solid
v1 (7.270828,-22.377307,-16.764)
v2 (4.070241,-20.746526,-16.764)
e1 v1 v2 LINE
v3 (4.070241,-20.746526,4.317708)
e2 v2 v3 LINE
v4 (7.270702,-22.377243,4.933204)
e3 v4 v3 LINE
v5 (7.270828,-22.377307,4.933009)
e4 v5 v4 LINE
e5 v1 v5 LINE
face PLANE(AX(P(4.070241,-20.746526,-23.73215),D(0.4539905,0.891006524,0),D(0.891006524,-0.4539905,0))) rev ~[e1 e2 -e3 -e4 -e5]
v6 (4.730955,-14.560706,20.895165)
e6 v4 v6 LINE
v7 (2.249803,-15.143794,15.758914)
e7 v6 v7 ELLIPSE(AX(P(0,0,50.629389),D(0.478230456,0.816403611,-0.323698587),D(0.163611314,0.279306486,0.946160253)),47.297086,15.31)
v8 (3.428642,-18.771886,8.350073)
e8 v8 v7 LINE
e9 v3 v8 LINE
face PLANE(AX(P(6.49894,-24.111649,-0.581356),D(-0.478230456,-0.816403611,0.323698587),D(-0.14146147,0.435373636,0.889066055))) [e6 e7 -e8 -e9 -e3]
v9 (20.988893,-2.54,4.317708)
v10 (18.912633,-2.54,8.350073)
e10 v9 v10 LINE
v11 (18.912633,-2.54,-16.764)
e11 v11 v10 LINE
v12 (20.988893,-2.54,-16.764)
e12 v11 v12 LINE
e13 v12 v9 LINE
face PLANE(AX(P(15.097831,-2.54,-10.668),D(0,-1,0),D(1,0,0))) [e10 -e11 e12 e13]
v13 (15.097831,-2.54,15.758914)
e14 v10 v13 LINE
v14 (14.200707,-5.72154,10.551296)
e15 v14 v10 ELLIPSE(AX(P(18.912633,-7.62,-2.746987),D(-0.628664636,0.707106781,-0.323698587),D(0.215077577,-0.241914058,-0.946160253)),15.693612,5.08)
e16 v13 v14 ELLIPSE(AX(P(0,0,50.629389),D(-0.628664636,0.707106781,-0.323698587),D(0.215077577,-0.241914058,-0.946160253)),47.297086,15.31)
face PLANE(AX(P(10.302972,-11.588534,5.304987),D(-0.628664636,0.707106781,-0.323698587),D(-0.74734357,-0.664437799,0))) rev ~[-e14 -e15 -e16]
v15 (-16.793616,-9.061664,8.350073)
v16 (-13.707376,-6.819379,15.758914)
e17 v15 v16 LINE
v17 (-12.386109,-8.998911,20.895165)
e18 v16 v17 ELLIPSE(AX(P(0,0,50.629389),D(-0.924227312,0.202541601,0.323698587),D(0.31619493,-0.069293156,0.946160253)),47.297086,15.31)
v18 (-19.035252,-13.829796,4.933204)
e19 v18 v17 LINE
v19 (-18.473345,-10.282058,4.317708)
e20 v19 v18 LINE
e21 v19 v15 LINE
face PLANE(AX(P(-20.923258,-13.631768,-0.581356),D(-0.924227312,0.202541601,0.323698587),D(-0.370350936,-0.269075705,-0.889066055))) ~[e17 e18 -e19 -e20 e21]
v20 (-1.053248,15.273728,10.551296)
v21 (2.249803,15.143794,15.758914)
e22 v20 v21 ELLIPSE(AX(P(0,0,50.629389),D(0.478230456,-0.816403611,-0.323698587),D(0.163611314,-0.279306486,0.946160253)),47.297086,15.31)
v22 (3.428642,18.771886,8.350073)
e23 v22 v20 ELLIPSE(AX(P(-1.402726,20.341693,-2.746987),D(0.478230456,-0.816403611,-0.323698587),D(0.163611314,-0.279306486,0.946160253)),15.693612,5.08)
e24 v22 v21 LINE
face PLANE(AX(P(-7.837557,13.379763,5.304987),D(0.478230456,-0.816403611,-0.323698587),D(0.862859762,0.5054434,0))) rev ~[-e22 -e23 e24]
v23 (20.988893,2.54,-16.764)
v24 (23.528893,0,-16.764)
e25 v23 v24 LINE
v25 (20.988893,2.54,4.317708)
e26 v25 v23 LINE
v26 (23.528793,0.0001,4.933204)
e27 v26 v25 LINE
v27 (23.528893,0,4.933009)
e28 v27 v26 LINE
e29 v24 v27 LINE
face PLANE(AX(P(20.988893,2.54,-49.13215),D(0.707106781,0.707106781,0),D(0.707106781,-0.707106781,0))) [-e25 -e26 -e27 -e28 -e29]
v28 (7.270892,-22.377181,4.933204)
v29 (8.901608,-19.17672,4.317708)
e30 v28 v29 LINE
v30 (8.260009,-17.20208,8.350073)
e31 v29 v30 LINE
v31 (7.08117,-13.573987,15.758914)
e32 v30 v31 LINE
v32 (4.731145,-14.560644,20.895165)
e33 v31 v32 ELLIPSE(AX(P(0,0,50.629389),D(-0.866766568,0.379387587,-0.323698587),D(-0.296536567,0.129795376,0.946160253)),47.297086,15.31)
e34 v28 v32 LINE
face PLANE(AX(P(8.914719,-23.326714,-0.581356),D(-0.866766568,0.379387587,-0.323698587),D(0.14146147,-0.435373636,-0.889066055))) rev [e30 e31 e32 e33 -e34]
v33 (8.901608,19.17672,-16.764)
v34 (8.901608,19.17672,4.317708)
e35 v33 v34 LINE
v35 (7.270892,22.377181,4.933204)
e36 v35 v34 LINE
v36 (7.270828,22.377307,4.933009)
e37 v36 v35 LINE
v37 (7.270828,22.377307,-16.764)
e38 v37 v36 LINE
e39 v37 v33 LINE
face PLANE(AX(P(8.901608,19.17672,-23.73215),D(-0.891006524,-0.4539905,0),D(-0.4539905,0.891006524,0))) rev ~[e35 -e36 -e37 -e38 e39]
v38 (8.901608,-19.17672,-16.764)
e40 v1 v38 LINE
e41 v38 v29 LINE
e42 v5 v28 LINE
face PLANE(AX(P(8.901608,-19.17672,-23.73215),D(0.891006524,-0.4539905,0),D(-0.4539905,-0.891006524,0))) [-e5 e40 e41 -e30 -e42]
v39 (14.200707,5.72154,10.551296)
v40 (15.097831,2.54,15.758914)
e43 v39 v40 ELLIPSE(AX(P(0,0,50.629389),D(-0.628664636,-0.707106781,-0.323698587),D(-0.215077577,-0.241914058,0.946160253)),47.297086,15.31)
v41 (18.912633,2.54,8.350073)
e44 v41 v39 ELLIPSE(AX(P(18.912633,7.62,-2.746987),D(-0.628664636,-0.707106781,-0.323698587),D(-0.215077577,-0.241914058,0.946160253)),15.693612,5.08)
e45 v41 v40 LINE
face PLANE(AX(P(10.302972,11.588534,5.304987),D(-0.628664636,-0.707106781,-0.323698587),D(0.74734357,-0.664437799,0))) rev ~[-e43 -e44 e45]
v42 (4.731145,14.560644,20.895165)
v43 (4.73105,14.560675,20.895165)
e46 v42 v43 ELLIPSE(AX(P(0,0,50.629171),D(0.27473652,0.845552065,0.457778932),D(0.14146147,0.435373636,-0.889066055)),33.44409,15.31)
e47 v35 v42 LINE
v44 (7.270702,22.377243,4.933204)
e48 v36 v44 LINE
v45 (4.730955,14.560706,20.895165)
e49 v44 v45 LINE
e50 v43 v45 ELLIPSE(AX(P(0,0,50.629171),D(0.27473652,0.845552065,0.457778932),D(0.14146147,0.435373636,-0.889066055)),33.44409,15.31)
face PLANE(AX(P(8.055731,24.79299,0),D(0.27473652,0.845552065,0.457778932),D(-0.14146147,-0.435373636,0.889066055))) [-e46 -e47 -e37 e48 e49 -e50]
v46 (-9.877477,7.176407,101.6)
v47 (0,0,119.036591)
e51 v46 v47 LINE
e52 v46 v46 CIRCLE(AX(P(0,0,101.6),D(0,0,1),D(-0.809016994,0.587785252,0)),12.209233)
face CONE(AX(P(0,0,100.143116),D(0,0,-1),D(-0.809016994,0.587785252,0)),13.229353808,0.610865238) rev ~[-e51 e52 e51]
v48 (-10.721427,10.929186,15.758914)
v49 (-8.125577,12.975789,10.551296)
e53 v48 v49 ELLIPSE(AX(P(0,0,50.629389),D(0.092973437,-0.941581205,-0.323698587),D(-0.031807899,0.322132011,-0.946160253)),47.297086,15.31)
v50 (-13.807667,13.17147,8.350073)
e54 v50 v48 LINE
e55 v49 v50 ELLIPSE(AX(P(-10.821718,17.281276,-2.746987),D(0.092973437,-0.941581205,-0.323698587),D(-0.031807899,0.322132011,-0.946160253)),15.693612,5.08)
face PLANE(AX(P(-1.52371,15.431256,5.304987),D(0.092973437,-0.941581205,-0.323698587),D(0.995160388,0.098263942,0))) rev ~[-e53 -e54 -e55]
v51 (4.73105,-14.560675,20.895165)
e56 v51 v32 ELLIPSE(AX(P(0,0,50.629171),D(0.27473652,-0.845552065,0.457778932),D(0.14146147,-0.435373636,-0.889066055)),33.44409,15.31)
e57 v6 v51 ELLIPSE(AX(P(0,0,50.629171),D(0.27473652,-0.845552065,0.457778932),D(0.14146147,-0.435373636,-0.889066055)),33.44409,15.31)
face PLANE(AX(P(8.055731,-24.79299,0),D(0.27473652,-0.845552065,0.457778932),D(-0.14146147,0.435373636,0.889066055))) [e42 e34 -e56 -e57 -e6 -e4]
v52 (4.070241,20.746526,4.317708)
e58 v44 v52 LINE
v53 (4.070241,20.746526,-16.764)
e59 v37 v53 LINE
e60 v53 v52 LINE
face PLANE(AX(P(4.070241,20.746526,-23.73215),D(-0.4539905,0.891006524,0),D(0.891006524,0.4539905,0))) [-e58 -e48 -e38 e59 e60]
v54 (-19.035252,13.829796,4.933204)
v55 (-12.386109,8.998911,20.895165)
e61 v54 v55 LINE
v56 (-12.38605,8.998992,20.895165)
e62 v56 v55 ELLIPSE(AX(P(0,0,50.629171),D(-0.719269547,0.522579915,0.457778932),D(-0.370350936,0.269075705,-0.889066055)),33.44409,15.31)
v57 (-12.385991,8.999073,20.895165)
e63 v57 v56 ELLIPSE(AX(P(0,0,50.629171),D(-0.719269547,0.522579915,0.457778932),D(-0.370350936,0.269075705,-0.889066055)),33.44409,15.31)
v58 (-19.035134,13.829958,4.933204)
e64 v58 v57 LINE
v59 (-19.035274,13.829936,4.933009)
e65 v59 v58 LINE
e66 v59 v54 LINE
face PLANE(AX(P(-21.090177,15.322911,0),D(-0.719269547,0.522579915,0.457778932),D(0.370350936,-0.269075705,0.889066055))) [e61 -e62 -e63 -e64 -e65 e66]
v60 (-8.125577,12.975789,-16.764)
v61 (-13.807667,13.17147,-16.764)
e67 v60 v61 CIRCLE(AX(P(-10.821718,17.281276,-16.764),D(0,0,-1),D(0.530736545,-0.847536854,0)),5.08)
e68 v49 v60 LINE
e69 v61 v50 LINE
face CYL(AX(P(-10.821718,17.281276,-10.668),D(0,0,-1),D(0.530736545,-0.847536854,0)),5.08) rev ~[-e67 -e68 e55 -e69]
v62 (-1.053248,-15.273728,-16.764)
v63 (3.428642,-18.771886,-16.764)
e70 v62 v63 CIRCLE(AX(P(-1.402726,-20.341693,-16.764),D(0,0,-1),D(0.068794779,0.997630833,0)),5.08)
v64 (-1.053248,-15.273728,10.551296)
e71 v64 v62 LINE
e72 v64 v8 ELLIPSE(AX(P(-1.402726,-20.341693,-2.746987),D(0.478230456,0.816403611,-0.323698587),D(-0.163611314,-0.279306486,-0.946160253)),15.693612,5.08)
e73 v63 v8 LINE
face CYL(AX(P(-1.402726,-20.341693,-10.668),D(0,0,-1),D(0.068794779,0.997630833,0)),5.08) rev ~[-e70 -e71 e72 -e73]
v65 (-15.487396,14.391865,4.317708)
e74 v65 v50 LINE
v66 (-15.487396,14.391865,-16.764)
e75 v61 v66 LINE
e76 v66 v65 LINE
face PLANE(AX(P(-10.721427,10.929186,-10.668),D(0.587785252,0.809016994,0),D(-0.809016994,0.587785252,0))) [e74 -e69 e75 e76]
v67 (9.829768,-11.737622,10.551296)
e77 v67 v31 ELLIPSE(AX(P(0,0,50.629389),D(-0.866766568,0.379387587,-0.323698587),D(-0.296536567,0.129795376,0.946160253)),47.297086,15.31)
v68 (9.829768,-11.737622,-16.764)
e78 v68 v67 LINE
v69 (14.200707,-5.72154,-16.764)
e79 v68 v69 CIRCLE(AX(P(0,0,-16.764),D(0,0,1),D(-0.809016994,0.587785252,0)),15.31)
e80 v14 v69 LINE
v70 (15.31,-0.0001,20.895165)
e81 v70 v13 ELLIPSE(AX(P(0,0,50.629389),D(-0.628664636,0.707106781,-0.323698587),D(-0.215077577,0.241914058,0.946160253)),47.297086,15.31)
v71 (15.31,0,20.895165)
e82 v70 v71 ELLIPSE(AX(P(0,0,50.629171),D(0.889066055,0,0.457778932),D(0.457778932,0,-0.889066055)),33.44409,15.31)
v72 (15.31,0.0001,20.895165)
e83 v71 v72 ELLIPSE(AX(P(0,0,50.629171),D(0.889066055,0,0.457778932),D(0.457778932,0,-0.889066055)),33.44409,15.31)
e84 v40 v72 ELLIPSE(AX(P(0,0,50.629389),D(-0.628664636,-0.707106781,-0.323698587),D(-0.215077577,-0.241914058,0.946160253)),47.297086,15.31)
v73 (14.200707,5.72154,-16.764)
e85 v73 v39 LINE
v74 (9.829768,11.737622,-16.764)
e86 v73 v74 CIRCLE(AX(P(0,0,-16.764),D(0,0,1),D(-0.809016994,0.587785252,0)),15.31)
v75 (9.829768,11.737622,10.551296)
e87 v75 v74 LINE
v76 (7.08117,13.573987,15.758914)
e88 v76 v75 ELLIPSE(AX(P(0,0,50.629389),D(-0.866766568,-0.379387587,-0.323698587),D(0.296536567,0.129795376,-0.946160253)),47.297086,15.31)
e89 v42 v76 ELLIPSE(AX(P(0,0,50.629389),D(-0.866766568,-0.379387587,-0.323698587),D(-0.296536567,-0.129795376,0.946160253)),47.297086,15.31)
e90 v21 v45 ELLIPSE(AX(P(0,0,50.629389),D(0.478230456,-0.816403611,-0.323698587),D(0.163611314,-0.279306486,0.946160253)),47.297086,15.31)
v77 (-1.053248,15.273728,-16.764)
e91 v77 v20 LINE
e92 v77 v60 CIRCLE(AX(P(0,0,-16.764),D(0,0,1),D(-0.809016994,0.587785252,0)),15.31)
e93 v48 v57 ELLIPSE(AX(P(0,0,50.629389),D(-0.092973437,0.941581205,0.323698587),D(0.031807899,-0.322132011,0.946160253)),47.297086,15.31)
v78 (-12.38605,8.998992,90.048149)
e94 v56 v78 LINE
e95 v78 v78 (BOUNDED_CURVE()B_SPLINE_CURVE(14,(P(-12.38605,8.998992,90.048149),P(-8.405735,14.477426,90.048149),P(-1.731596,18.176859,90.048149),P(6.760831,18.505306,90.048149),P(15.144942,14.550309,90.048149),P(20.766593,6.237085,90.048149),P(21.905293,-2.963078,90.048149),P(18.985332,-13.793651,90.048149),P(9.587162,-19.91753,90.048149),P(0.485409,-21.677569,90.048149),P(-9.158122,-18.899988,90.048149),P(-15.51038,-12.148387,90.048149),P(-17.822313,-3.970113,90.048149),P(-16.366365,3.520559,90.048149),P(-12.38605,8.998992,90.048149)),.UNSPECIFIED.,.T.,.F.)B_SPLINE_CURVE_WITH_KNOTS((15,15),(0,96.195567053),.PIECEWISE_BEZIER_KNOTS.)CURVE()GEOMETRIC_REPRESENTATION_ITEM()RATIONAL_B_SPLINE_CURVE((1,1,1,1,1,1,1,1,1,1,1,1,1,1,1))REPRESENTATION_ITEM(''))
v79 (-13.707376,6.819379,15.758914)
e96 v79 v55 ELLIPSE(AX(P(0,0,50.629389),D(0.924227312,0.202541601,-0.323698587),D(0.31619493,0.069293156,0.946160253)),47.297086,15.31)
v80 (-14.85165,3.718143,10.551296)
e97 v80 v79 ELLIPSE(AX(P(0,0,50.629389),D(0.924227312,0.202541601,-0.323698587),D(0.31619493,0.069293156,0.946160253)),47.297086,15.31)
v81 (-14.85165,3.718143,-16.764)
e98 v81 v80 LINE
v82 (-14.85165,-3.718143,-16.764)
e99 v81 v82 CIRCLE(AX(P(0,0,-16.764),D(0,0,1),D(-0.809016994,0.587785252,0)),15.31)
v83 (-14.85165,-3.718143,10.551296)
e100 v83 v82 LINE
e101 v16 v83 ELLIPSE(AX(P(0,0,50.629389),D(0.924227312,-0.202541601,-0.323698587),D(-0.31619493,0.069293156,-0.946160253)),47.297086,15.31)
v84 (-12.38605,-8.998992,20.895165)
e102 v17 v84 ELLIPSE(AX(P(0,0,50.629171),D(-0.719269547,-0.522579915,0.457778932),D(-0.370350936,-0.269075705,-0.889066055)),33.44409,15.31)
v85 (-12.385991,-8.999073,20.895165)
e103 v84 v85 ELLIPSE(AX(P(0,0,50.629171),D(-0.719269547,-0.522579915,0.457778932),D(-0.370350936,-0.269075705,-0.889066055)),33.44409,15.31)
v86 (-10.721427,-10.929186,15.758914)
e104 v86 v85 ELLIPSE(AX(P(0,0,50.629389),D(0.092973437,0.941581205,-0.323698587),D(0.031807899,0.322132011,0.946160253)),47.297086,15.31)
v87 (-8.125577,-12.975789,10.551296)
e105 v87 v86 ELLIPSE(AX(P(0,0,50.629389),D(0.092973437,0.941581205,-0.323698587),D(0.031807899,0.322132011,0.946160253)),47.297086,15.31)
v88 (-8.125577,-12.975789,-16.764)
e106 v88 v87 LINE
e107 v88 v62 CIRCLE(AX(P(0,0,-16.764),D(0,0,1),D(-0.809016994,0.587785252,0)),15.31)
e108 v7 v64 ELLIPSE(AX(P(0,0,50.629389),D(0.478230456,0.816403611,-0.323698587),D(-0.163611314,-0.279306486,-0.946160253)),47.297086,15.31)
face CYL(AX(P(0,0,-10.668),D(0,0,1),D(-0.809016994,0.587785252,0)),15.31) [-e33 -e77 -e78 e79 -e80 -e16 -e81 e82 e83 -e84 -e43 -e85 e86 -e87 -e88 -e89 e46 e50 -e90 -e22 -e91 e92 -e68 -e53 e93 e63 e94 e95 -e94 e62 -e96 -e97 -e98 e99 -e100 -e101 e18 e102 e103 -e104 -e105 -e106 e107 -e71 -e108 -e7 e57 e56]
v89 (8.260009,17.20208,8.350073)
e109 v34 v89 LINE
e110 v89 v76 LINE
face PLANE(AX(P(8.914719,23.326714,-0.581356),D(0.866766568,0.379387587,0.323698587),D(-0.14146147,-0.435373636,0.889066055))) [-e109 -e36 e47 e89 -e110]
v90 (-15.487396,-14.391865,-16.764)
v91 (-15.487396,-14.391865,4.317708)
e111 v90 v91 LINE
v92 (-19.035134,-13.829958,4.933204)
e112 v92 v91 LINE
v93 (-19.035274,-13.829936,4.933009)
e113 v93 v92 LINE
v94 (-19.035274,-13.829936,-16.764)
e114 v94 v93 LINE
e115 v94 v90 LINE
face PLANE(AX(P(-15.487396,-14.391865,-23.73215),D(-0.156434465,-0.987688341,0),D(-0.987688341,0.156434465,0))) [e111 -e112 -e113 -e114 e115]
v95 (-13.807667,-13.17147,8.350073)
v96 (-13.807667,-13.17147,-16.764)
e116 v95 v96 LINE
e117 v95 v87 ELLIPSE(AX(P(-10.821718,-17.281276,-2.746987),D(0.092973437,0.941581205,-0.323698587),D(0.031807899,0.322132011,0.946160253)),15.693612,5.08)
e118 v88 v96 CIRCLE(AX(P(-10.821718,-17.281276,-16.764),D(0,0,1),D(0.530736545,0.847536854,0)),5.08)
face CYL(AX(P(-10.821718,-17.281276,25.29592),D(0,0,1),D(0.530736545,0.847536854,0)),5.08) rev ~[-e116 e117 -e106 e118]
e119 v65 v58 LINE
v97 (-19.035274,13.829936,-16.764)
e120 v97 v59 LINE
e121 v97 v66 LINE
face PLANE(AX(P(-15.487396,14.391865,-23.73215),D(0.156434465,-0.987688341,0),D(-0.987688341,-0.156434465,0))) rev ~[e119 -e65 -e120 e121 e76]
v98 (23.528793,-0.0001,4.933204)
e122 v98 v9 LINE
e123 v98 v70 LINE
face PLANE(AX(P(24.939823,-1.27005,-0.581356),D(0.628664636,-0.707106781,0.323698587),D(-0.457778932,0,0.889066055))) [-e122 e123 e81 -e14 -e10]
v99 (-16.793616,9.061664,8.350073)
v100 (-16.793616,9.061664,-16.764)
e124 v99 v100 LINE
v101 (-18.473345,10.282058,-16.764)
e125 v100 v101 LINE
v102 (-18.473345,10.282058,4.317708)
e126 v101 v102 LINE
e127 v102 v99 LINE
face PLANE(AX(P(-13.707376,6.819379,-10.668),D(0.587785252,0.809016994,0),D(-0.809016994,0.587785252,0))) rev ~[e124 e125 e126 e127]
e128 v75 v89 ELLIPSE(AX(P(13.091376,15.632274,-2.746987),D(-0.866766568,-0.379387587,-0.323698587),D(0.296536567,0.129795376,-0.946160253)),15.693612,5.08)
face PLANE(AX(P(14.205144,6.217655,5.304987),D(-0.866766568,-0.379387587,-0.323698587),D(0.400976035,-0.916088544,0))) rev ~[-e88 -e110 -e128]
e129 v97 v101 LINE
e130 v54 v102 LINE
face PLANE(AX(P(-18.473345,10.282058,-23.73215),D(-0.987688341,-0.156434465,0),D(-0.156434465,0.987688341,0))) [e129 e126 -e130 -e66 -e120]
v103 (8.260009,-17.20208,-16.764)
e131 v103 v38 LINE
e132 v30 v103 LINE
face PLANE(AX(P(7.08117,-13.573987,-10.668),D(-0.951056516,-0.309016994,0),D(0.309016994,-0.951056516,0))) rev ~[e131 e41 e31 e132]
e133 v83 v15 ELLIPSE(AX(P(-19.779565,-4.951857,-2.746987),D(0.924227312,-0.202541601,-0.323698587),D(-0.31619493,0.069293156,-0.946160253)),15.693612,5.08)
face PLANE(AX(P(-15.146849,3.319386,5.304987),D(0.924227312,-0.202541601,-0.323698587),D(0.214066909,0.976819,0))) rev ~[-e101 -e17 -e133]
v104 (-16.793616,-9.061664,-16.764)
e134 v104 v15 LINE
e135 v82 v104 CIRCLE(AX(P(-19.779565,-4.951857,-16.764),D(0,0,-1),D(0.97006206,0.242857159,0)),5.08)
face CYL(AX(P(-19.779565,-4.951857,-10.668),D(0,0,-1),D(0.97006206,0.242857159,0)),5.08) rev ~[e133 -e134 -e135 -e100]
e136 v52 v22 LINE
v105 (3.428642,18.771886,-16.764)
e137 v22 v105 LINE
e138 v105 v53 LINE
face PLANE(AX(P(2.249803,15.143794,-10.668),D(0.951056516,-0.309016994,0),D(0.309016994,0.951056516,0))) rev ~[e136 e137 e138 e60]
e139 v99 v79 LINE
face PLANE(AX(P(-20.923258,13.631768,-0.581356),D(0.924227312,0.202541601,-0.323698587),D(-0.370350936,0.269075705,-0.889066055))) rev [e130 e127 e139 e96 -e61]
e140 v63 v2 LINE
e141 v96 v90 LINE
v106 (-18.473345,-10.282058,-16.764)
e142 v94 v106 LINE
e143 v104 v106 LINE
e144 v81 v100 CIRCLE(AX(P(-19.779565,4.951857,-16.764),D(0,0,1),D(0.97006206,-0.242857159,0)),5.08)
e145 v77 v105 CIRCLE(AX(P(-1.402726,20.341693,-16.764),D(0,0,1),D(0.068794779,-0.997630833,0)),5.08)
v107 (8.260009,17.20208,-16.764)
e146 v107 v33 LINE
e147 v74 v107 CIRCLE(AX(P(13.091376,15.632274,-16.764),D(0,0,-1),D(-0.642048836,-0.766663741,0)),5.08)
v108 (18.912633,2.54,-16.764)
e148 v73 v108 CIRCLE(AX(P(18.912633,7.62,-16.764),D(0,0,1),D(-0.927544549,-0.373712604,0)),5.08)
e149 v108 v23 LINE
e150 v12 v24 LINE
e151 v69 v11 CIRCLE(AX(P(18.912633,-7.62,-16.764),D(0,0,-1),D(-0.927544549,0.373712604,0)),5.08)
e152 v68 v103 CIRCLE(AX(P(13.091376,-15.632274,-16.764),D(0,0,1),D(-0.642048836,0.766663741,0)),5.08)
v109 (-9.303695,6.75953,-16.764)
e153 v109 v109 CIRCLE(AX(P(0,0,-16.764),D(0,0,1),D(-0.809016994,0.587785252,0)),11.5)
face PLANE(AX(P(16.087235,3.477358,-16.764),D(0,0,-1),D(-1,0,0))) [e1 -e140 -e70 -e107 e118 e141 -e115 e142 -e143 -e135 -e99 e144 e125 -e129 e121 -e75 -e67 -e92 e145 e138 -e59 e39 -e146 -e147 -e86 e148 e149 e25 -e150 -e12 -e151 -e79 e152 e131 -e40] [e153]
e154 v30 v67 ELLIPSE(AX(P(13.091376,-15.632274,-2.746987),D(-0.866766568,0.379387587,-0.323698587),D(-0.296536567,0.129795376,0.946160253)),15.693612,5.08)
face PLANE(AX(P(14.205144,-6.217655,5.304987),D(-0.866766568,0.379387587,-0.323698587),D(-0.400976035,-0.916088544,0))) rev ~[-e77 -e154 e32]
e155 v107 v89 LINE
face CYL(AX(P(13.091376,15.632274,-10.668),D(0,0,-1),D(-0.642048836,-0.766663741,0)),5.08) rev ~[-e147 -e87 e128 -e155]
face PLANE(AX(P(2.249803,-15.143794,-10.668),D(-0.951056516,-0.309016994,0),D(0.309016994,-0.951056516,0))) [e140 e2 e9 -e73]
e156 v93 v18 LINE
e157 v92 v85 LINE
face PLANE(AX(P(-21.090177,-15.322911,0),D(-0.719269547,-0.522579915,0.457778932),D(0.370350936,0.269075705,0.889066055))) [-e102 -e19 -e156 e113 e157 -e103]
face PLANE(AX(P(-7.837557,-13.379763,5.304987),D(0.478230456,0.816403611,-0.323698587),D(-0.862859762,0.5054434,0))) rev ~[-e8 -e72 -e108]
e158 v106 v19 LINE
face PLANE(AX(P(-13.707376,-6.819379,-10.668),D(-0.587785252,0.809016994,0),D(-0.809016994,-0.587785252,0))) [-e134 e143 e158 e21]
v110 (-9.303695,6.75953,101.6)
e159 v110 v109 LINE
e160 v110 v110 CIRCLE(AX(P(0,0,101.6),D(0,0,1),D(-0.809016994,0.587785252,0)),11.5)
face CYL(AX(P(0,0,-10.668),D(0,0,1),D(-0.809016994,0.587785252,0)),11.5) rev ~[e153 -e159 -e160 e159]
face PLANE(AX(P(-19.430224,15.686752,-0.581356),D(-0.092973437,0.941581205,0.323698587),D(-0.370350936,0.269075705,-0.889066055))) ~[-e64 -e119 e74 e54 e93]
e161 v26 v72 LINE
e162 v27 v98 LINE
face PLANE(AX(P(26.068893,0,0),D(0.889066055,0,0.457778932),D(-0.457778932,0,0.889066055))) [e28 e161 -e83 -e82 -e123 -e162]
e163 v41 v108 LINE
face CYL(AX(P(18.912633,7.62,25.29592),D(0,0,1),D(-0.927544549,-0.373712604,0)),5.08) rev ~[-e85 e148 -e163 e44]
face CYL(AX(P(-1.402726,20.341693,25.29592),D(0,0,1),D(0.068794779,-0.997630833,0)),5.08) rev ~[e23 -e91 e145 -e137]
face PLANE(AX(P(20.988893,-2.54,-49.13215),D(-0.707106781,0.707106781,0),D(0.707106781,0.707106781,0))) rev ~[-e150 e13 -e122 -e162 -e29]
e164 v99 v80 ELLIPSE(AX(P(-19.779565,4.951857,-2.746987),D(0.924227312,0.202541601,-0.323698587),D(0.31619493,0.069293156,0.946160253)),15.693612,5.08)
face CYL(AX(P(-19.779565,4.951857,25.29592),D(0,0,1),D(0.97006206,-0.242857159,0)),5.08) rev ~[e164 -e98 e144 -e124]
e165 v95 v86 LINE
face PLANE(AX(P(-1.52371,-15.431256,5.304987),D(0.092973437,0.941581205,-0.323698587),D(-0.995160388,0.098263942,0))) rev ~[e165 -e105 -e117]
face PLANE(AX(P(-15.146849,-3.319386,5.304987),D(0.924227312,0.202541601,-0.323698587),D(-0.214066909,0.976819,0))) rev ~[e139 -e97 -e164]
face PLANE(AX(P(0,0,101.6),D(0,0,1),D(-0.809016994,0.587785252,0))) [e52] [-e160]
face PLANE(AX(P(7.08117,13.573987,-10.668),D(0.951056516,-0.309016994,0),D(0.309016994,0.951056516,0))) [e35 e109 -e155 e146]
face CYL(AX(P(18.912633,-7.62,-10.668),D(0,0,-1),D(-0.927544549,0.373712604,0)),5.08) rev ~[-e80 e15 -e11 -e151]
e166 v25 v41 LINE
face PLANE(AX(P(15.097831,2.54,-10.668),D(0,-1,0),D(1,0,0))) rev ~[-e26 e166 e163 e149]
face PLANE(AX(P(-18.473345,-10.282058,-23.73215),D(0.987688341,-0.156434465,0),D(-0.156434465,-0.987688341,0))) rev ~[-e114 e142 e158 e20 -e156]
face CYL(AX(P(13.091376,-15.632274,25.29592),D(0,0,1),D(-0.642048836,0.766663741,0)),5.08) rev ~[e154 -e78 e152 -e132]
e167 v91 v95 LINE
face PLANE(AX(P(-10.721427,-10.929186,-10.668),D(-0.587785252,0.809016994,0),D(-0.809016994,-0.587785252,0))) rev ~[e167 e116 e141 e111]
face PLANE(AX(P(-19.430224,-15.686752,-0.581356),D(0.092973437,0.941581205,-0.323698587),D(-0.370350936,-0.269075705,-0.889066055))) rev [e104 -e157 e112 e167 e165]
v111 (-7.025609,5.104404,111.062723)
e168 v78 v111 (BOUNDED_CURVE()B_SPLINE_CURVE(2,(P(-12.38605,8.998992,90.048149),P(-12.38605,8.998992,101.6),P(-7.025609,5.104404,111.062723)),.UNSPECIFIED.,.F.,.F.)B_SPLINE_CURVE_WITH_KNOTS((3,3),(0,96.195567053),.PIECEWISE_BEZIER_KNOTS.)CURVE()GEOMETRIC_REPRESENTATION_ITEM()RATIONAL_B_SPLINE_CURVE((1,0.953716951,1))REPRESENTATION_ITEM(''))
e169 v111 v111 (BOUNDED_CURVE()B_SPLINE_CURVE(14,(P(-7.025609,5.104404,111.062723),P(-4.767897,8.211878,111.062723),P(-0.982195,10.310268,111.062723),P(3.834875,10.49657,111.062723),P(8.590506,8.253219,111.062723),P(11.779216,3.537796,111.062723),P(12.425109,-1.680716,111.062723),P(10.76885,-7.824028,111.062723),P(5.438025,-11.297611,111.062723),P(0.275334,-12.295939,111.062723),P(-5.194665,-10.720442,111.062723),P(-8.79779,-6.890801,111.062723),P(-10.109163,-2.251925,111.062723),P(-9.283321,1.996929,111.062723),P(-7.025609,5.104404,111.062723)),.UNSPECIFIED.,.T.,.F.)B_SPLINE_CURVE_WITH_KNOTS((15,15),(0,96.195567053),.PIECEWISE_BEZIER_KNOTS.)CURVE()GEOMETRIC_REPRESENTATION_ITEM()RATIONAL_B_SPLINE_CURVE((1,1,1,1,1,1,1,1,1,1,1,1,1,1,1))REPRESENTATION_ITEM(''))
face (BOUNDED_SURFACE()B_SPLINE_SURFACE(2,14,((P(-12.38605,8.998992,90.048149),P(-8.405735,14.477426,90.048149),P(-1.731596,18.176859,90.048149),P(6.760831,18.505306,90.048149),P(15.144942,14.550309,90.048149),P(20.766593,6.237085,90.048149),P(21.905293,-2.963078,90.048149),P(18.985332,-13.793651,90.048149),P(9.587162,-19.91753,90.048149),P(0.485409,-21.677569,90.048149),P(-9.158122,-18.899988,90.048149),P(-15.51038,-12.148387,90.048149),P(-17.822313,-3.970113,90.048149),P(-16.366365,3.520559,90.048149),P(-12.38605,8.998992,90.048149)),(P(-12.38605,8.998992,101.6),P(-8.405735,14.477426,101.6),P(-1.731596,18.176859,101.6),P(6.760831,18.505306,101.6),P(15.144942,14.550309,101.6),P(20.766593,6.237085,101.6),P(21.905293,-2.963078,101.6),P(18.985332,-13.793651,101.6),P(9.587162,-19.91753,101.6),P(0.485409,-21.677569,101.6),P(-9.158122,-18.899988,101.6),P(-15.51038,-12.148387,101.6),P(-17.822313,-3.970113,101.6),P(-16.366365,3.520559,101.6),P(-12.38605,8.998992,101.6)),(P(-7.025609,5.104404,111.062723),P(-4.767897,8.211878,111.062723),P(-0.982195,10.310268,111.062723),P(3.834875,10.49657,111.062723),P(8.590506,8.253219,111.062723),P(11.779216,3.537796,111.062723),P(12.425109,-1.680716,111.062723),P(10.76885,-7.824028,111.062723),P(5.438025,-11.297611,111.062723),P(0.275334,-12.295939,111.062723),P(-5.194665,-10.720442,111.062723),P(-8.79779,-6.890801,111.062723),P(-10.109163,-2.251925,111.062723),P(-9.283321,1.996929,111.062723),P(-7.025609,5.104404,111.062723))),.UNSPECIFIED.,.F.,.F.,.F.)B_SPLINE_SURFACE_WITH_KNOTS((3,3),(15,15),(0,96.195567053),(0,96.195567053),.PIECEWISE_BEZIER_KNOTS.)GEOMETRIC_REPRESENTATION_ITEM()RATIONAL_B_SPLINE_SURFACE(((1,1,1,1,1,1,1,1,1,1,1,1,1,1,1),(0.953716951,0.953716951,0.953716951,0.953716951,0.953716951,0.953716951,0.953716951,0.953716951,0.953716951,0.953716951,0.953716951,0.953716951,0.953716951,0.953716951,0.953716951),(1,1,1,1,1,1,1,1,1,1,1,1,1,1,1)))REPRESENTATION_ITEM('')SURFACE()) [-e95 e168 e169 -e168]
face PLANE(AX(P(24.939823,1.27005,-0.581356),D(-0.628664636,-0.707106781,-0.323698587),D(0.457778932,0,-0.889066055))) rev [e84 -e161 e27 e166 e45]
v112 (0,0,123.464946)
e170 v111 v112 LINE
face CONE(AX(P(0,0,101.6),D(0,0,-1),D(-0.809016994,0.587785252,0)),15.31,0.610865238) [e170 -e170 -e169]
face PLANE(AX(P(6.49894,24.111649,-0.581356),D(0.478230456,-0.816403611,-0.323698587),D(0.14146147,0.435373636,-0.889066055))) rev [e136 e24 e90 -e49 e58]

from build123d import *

# Parameters (mm, degrees)
F0_R          = 15.31
F0_R_2        = 11.5
F1_DEPTH      = 101.6
F2_DEPTH      = 25.4
F3_DEPTH      = 25.4
F4_DEPTH      = 25.4
F5_DEPTH      = 25.4
F6_R          = 15.31
F7_DEPTH      = 25.4
F7_TAPER      = 35
F8_T          = 2.54
F10_DEPTH     = 2.54
F11_DEPTH     = 10.668
F12_COUNT     = 5
F14_SIZE      = 2.5399
F15_DEPTH     = 25.4
F16_T1_DEPTH  = 31.2479879022
F16_T3_DEPTH  = 26.3887057153
F16_T5_DEPTH  = 18.1838383234
F16_T7_DEPTH  = 38.4641495789
F17_DEPTH     = 19.304
F18_R         = 36.6377921473
F19_T1_DEPTH  = 6.096
F19_T6_DEPTH  = 35.9639195383
F19_T11_DEPTH = 35.9639195383
F19_T16_DEPTH = 35.9639195383
F19_T21_DEPTH = 35.9639195383
F19_T26_DEPTH = 35.9639195383
F19_T31_DEPTH = 35.9639195383
F19_T36_DEPTH = 35.9639195383
F19_T41_DEPTH = 35.9639195383
F19_T46_DEPTH = 35.9639195383
F19_T51_DEPTH = 35.9639195383


# Not quite as in the source:
# - a fillet or chamfer that OpenCascade refuses, or shapes differently, is made with other operations: its cross-section is extruded or revolved along the edge and cut away or added
# - a fillet or chamfer is up to 0.001 mm smaller than in the source, because OpenCascade refuses the exact size
# - a shell that OpenCascade refuses in one call is made with other operations: the cavity is built on its own and cut out


with BuildPart() as f1:
    # F0 (on Top) → F1 (new body)
    with BuildSketch(Plane.XY):
        Circle(F0_R)
        Circle(F0_R_2, mode=Mode.SUBTRACT)
    extrude(amount=F1_DEPTH)

    # F2 (add): a face of the model
    f2_faces = [f1.faces().sort_by_distance(p)[0] for p in [
        (-14.8769678072, 0, 101.6),
    ]]
    extrude(f2_faces, amount=F2_DEPTH)

    # F3 (cut): a face of the model
    f3_faces = [f1.faces().sort_by_distance(p)[0] for p in [
        (-14.8769678072, 0, 127),
    ]]
    extrude(f3_faces, amount=-F3_DEPTH, mode=Mode.SUBTRACT)

    # F4 (add): a face of the model
    f4_faces = [f1.faces().sort_by_distance(p)[0] for p in [
        (-14.8769678072, 0, 101.6),
    ]]
    extrude(f4_faces, amount=F4_DEPTH)

    # F5 (cut): a face of the model
    f5_faces = [f1.faces().sort_by_distance(p)[0] for p in [
        (-14.8769678072, 0, 127),
    ]]
    extrude(f5_faces, amount=-F5_DEPTH, mode=Mode.SUBTRACT)

    # F6 (on face) → F7 (join)
    with BuildSketch(Plane.XY.offset(101.6)):
        Circle(F6_R)
    extrude(amount=F7_DEPTH, taper=F7_TAPER)

    # F8: shell of thickness 2.54, made by hand


with BuildPart() as f8_core1:
    # F8_t2: copy of F1
    add(f1.part)

    # the walls: a layer under each face that stays
    f8_faces = [f8_core1.faces().sort_by_distance(p)[0] for p in [
        (-15.31, 0, 50.8),
        (-7.655, 0, 112.5324729916),
        (-10.2066666667, -10.2066666667, 0),
        (-11.5, 0, 50.8),
    ]]
    thicken(f8_faces, amount=-F8_T, mode=Mode.SUBTRACT)


with BuildPart() as f1_1:
    add(f1.part)

    # what is left inside the walls is the cavity
    f8_cavity = [f8_core1.part.solids().sort_by_distance(p)[0] for p in [
        (-8.118682, 0, 107.397628),
    ]]
    add(f8_cavity, mode=Mode.SUBTRACT)

    # F9 (on Front) → F10 (join, symmetric)
    with BuildSketch(Plane.XZ):
        Polygon((26.068892777, 0), (12.5377972627, 26.279142328), (12.7, 0), align=None)
    extrude(amount=F10_DEPTH, both=True)

    # F11 (add): a face of the model
    f11_faces = [f1_1.faces().sort_by_distance(p)[0] for p in [
        (-14.7952381942, 0, 0),
    ]]
    extrude(f11_faces, amount=F11_DEPTH)


with BuildPart() as f12_1:
    # F12: instance of F1
    add(f1_1.part.rotate(Axis((0, 0, 0), (0, 0, 1)), 1 * 360 / F12_COUNT))


with BuildPart() as f12_2:
    # F12: instance of F1
    add(f1_1.part.rotate(Axis((0, 0, 0), (0, 0, 1)), 2 * 360 / F12_COUNT))


with BuildPart() as f12_3:
    # F12: instance of F1
    add(f1_1.part.rotate(Axis((0, 0, 0), (0, 0, 1)), 3 * 360 / F12_COUNT))


with BuildPart() as f12_4:
    # F12: instance of F1
    add(f1_1.part.rotate(Axis((0, 0, 0), (0, 0, 1)), 4 * 360 / F12_COUNT))


with BuildPart() as f12_2_1:
    add(f12_2.part)

    # F13: union F12_1, F1, F12_4, F12_3
    add(f12_1.part)
    add(f1_1.part)
    add(f12_4.part)
    add(f12_3.part)

    # F14 (size 2.54 in the source; OpenCascade refuses exactly that, so slightly less here)
    f14_edges = [f12_2_1.edges().sort_by_distance(p)[0] for p in [
        (20.583362, 2.54, 10.653612),
        (20.583362, -2.54, 10.653612),
        (8.776292, 18.791037, 10.653612),
        (3.944925, 20.360844, 10.653612),
        (-15.159315, 14.1535, 10.653612),
        (-18.145264, 10.043693, 10.653612),
        (-18.145264, -10.043693, 10.653612),
        (-15.159315, -14.1535, 10.653612),
        (8.776292, -18.791037, 10.653612),
        (3.944925, -20.360844, 10.653612),
    ]]
    chamfer(f14_edges, length=F14_SIZE)

    # F15 (add): a face of the model
    f15_faces = [f12_2_1.faces().sort_by_distance(p)[0] for p in [
        (-4.5128934655, 13.8892579239, -10.668),
    ]]
    extrude(f15_faces, amount=F15_DEPTH)

    # F16: chamfer of 5.08 on 13 edges, made by hand

    # F16_s2 → F16_t1 (cut)
    with BuildSketch(Plane.XY.offset(-23.7321495789)):
        Polygon((-15.4873964089, 14.391864802), (-22.583151822, 13.2680075522), (-19.5972027403, 17.3778138836), align=None)
        Polygon((-18.4733454905, 10.2820584706), (-19.5972027403, 17.3778138836), (-22.583151822, 13.2680075522), align=None)
        Polygon((-15.4873964089, -14.391864802), (-22.583151822, -13.2680075522), (-19.5972027403, -17.3778138836), align=None)
        Polygon((-18.4733454905, -10.2820584706), (-19.5972027403, -17.3778138836), (-22.583151822, -13.2680075522), align=None)
        Polygon((8.9016081126, -19.1767200797), (5.6400473412, -25.5778935139), (10.471414444, -24.0080871825), align=None)
        Polygon((4.0702410098, -20.7465264111), (10.471414444, -24.0080871825), (5.6400473412, -25.5778935139), align=None)
        Polygon((4.0702410098, 20.7465264111), (10.471414444, 24.0080871825), (5.6400473412, 25.5778935139), align=None)
        Polygon((8.9016081126, 19.1767200797), (5.6400473412, 25.5778935139), (10.471414444, 24.0080871825), align=None)
    extrude(amount=F16_T1_DEPTH, mode=Mode.SUBTRACT)

    # F16_s4 → F16_t3 (cut)
    with BuildSketch(Plane.XZ.offset(-13.1943528576)):
        Polygon((23.7433758033, 4.5164555577), (26.068892777, -5.08), (26.068892777, 0), align=None)
    extrude(amount=F16_T3_DEPTH, mode=Mode.SUBTRACT)

    # F16_s6 → F16_t5 (cut)
    with BuildSketch(Plane.XY.offset(-10.668)):
        Polygon((20.988892777, -2.54), (26.068892777, 2.54), (26.068892777, -2.54), align=None)
        Polygon((20.988892777, 2.54), (26.068892777, -2.54), (26.068892777, 2.54), align=None)
    extrude(amount=F16_T5_DEPTH, mode=Mode.SUBTRACT)

    # F16_s8 → F16_t7 (cut)
    with BuildSketch(Plane.XY.offset(-49.1321495789)):
        Polygon((20.988892777, -2.54), (26.068892777, 2.54), (26.068892777, -2.54), align=None)
        Polygon((20.988892777, 2.54), (26.068892777, -2.54), (26.068892777, 2.54), align=None)
    extrude(amount=F16_T7_DEPTH, mode=Mode.SUBTRACT)

    # F17 (cut): a face of the model
    f17_faces = [f12_2_1.faces().sort_by_distance(p)[0] for p in [
        (4.599928622, 20.1480200473, -36.068),
    ]]
    extrude(f17_faces, amount=-F17_DEPTH, mode=Mode.SUBTRACT)

    # F18
    f18_edges = [f12_2_1.edges().sort_by_distance(p)[0] for p in [
        (12.38605, -8.998992, 101.6),
    ]]
    fillet(f18_edges, radius=F18_R)

    # F19: fillet of radius 5.08 on 27 edges, made by hand

    # F19_s2 → F19_t1 (join)
    with BuildSketch(Plane.XY.offset(-16.764)):
        with BuildLine():
            ThreePointArc((14.2007070375, 5.7215399706), (16.0699037533, 3.4098588533), (18.9126333439, 2.54))
            Line((18.9126333439, 2.54), (15.09783097, 2.54))
            ThreePointArc((15.09783097, 2.54), (14.7353870492, 4.1550533702), (14.2007070375, 5.7215399706))
        make_face()
        with BuildLine():
            ThreePointArc((14.2007070375, -5.7215399706), (16.0699037533, -3.4098588533), (18.9126333439, -2.54))
            Line((18.9126333439, -2.54), (15.09783097, -2.54))
            ThreePointArc((15.09783097, -2.54), (14.7353870492, -4.1550533702), (14.2007070375, -5.7215399706))
        make_face()
        with BuildLine():
            ThreePointArc((-8.1255765104, 12.975789239), (-10.996560488, 12.2042861927), (-13.8076672428, 13.1714701273))
            Line((-13.8076672428, 13.1714701273), (-10.7214272921, 10.9291855515))
            ThreePointArc((-10.7214272921, 10.9291855515), (-9.4788994481, 12.0227519834), (-8.1255765104, 12.975789239))
        make_face()
        with BuildLine():
            ThreePointArc((-1.0532480655, 15.2737280489), (1.7229048756, 16.3370910149), (3.4286415603, 18.7718863477))
            Line((3.4286415603, 18.7718863477), (2.2498027966, 15.1437936917))
            ThreePointArc((2.2498027966, 15.1437936917), (0.6017944337, 15.2981679772), (-1.0532480655, 15.2737280489))
        make_face()
        with BuildLine():
            ThreePointArc((-14.8516501406, -3.7181430986), (-15.0050899808, -6.6870186712), (-16.7936163244, -9.0616637958))
            Line((-16.7936163244, -9.0616637958), (-13.7073763738, -6.8193792201))
            ThreePointArc((-13.7073763738, -6.8193792201), (-14.363457635, -5.2997344054), (-14.8516501406, -3.7181430986))
        make_face()
        with BuildLine():
            ThreePointArc((-14.8516501406, 3.7181430986), (-15.0050899808, 6.6870186712), (-16.7936163244, 9.0616637958))
            Line((-16.7936163244, 9.0616637958), (-13.7073763738, 6.8193792201))
            ThreePointArc((-13.7073763738, 6.8193792201), (-14.363457635, 5.2997344054), (-14.8516501406, 3.7181430986))
        make_face()
        with BuildLine():
            ThreePointArc((9.829767679, 11.7376218791), (8.2088418399, 14.2296823467), (8.260008663, 17.2020800163))
            Line((8.260008663, 17.2020800163), (7.0811698993, 13.5739873603))
            ThreePointArc((7.0811698993, 13.5739873603), (8.5051756002, 12.7302037694), (9.829767679, 11.7376218791))
        make_face()
        with BuildLine():
            ThreePointArc((-1.0532480655, -15.2737280489), (1.7229048756, -16.3370910149), (3.4286415603, -18.7718863477))
            Line((3.4286415603, -18.7718863477), (2.2498027966, -15.1437936917))
            ThreePointArc((2.2498027966, -15.1437936917), (0.6017944337, -15.2981679772), (-1.0532480655, -15.2737280489))
        make_face()
        with BuildLine():
            ThreePointArc((-8.1255765104, -12.975789239), (-10.996560488, -12.2042861927), (-13.8076672428, -13.1714701273))
            Line((-13.8076672428, -13.1714701273), (-10.7214272921, -10.9291855515))
            ThreePointArc((-10.7214272921, -10.9291855515), (-9.4788994481, -12.0227519834), (-8.1255765104, -12.975789239))
        make_face()
        with BuildLine():
            ThreePointArc((9.829767679, -11.7376218791), (8.2088418399, -14.2296823467), (8.260008663, -17.2020800163))
            Line((8.260008663, -17.2020800163), (7.0811698993, -13.5739873603))
            ThreePointArc((7.0811698993, -13.5739873603), (8.5051756002, -12.7302037694), (9.829767679, -11.7376218791))
        make_face()
    extrude(amount=F19_T1_DEPTH)


with BuildPart() as f19_tool4:
    # F19_s5 → F19_t6 (new body)
    with BuildSketch(Plane.XY.offset(-10.668)):
        with BuildLine():
            ThreePointArc((-8.1255765104, 12.975789239), (-10.996560488, 12.2042861927), (-13.8076672428, 13.1714701273))
            Line((-13.8076672428, 13.1714701273), (-10.7214272921, 10.9291855515))
            ThreePointArc((-10.7214272921, 10.9291855515), (-9.4788994481, 12.0227519834), (-8.1255765104, 12.975789239))
        make_face()
    extrude(amount=F19_T6_DEPTH)

    split(bisect_by=Plane(origin=(-1.5237102008, 15.4312558291, 5.3049866361), x_dir=(0.9951603879, 0.0982639424, 0), z_dir=(0.0929734367, -0.9415812046, -0.323698587)), keep=Keep.TOP)


with BuildPart() as f12_2_2:
    add(f12_2_1.part)

    # F19_t3: union F19_tool4
    add(f19_tool4.part)


with BuildPart() as f19_tool9:
    # F19_s10 → F19_t11 (new body)
    with BuildSketch(Plane.XY.offset(25.2959195383)):
        with BuildLine():
            ThreePointArc((-14.8516501406, 3.7181430986), (-15.0050899808, 6.6870186712), (-16.7936163244, 9.0616637958))
            Line((-16.7936163244, 9.0616637958), (-13.7073763738, 6.8193792201))
            ThreePointArc((-13.7073763738, 6.8193792201), (-14.363457635, 5.2997344054), (-14.8516501406, 3.7181430986))
        make_face()
    extrude(amount=-F19_T11_DEPTH)

    split(bisect_by=Plane(origin=(-15.1468487575, -3.3193857803, 5.3049866361), x_dir=(-0.2140669092, 0.9768189998, 0), z_dir=(0.9242273122, 0.202541601, -0.323698587)), keep=Keep.TOP)


with BuildPart() as f12_2_3:
    add(f12_2_2.part)

    # F19_t8: union F19_tool9
    add(f19_tool9.part)


with BuildPart() as f19_tool14:
    # F19_s15 → F19_t16 (new body)
    with BuildSketch(Plane.XY.offset(25.2959195383)):
        with BuildLine():
            ThreePointArc((-1.0532480655, 15.2737280489), (1.7229048756, 16.3370910149), (3.4286415603, 18.7718863477))
            Line((3.4286415603, 18.7718863477), (2.2498027966, 15.1437936917))
            ThreePointArc((2.2498027966, 15.1437936917), (0.6017944337, 15.2981679772), (-1.0532480655, 15.2737280489))
        make_face()
    extrude(amount=-F19_T16_DEPTH)

    split(bisect_by=Plane(origin=(-7.8375571537, 13.3797625951, 5.3049866361), x_dir=(0.8628597621, 0.5054434003, 0), z_dir=(0.4782304556, -0.816403611, -0.323698587)), keep=Keep.TOP)


with BuildPart() as f12_2_4:
    add(f12_2_3.part)

    # F19_t13: union F19_tool14
    add(f19_tool14.part)


with BuildPart() as f19_tool19:
    # F19_s20 → F19_t21 (new body)
    with BuildSketch(Plane.XY.offset(-10.668)):
        with BuildLine():
            ThreePointArc((-14.8516501406, -3.7181430986), (-15.0050899808, -6.6870186712), (-16.7936163244, -9.0616637958))
            Line((-16.7936163244, -9.0616637958), (-13.7073763738, -6.8193792201))
            ThreePointArc((-13.7073763738, -6.8193792201), (-14.363457635, -5.2997344054), (-14.8516501406, -3.7181430986))
        make_face()
    extrude(amount=F19_T21_DEPTH)

    split(bisect_by=Plane(origin=(-15.1468487575, 3.3193857803, 5.3049866361), x_dir=(0.2140669092, 0.9768189998, 0), z_dir=(0.9242273122, -0.202541601, -0.323698587)), keep=Keep.TOP)


with BuildPart() as f12_2_5:
    add(f12_2_4.part)

    # F19_t18: union F19_tool19
    add(f19_tool19.part)


with BuildPart() as f19_tool24:
    # F19_s25 → F19_t26 (new body)
    with BuildSketch(Plane.XY.offset(-10.668)):
        with BuildLine():
            ThreePointArc((9.829767679, 11.7376218791), (8.2088418399, 14.2296823467), (8.260008663, 17.2020800163))
            Line((8.260008663, 17.2020800163), (7.0811698993, 13.5739873603))
            ThreePointArc((7.0811698993, 13.5739873603), (8.5051756002, 12.7302037694), (9.829767679, 11.7376218791))
        make_face()
    extrude(amount=F19_T26_DEPTH)

    split(bisect_by=Plane(origin=(14.2051440643, 6.2176548112, 5.3049866361), x_dir=(0.4009760348, -0.9160885435, 0), z_dir=(-0.8667665683, -0.3793875866, -0.323698587)), keep=Keep.TOP)


with BuildPart() as f12_2_6:
    add(f12_2_5.part)

    # F19_t23: union F19_tool24
    add(f19_tool24.part)


with BuildPart() as f19_tool29:
    # F19_s30 → F19_t31 (new body)
    with BuildSketch(Plane.XY.offset(25.2959195383)):
        with BuildLine():
            ThreePointArc((-8.1255765104, -12.975789239), (-10.996560488, -12.2042861927), (-13.8076672428, -13.1714701273))
            Line((-13.8076672428, -13.1714701273), (-10.7214272921, -10.9291855515))
            ThreePointArc((-10.7214272921, -10.9291855515), (-9.4788994481, -12.0227519834), (-8.1255765104, -12.975789239))
        make_face()
    extrude(amount=-F19_T31_DEPTH)

    split(bisect_by=Plane(origin=(-1.5237102008, -15.4312558291, 5.3049866361), x_dir=(-0.9951603879, 0.0982639424, 0), z_dir=(0.0929734367, 0.9415812046, -0.323698587)), keep=Keep.TOP)


with BuildPart() as f12_2_7:
    add(f12_2_6.part)

    # F19_t28: union F19_tool29
    add(f19_tool29.part)


with BuildPart() as f19_tool34:
    # F19_s35 → F19_t36 (new body)
    with BuildSketch(Plane.XY.offset(25.2959195383)):
        with BuildLine():
            ThreePointArc((14.2007070375, 5.7215399706), (16.0699037533, 3.4098588533), (18.9126333439, 2.54))
            Line((18.9126333439, 2.54), (15.09783097, 2.54))
            ThreePointArc((15.09783097, 2.54), (14.7353870492, 4.1550533702), (14.2007070375, 5.7215399706))
        make_face()
    extrude(amount=-F19_T36_DEPTH)

    split(bisect_by=Plane(origin=(10.3029720477, 11.5885338255, 5.3049866361), x_dir=(0.7473435697, -0.664437799, 0), z_dir=(-0.6286646362, -0.7071067812, -0.323698587)), keep=Keep.TOP)


with BuildPart() as f12_2_8:
    add(f12_2_7.part)

    # F19_t33: union F19_tool34
    add(f19_tool34.part)


with BuildPart() as f19_tool39:
    # F19_s40 → F19_t41 (new body)
    with BuildSketch(Plane.XY.offset(-10.668)):
        with BuildLine():
            ThreePointArc((-1.0532480655, -15.2737280489), (1.7229048756, -16.3370910149), (3.4286415603, -18.7718863477))
            Line((3.4286415603, -18.7718863477), (2.2498027966, -15.1437936917))
            ThreePointArc((2.2498027966, -15.1437936917), (0.6017944337, -15.2981679772), (-1.0532480655, -15.2737280489))
        make_face()
    extrude(amount=F19_T41_DEPTH)

    split(bisect_by=Plane(origin=(-7.8375571537, -13.3797625951, 5.3049866361), x_dir=(-0.8628597621, 0.5054434003, 0), z_dir=(0.4782304556, 0.816403611, -0.323698587)), keep=Keep.TOP)


with BuildPart() as f12_2_9:
    add(f12_2_8.part)

    # F19_t38: union F19_tool39
    add(f19_tool39.part)


with BuildPart() as f19_tool44:
    # F19_s45 → F19_t46 (new body)
    with BuildSketch(Plane.XY.offset(-10.668)):
        with BuildLine():
            ThreePointArc((14.2007070375, -5.7215399706), (16.0699037533, -3.4098588533), (18.9126333439, -2.54))
            Line((18.9126333439, -2.54), (15.09783097, -2.54))
            ThreePointArc((15.09783097, -2.54), (14.7353870492, -4.1550533702), (14.2007070375, -5.7215399706))
        make_face()
    extrude(amount=F19_T46_DEPTH)

    split(bisect_by=Plane(origin=(10.3029720477, -11.5885338255, 5.3049866361), x_dir=(-0.7473435697, -0.664437799, 0), z_dir=(-0.6286646362, 0.7071067812, -0.323698587)), keep=Keep.TOP)


with BuildPart() as f12_2_10:
    add(f12_2_9.part)

    # F19_t43: union F19_tool44
    add(f19_tool44.part)


with BuildPart() as f19_tool49:
    # F19_s50 → F19_t51 (new body)
    with BuildSketch(Plane.XY.offset(25.2959195383)):
        with BuildLine():
            ThreePointArc((9.829767679, -11.7376218791), (8.2088418399, -14.2296823467), (8.260008663, -17.2020800163))
            Line((8.260008663, -17.2020800163), (7.0811698993, -13.5739873603))
            ThreePointArc((7.0811698993, -13.5739873603), (8.5051756002, -12.7302037694), (9.829767679, -11.7376218791))
        make_face()
    extrude(amount=-F19_T51_DEPTH)

    split(bisect_by=Plane(origin=(14.2051440643, -6.2176548112, 5.3049866361), x_dir=(-0.4009760348, -0.9160885435, 0), z_dir=(-0.8667665683, 0.3793875866, -0.323698587)), keep=Keep.TOP)


with BuildPart() as f12_2_11:
    add(f12_2_10.part)

    # F19_t48: union F19_tool49
    add(f19_tool49.part)


solid = f12_2_11.part
